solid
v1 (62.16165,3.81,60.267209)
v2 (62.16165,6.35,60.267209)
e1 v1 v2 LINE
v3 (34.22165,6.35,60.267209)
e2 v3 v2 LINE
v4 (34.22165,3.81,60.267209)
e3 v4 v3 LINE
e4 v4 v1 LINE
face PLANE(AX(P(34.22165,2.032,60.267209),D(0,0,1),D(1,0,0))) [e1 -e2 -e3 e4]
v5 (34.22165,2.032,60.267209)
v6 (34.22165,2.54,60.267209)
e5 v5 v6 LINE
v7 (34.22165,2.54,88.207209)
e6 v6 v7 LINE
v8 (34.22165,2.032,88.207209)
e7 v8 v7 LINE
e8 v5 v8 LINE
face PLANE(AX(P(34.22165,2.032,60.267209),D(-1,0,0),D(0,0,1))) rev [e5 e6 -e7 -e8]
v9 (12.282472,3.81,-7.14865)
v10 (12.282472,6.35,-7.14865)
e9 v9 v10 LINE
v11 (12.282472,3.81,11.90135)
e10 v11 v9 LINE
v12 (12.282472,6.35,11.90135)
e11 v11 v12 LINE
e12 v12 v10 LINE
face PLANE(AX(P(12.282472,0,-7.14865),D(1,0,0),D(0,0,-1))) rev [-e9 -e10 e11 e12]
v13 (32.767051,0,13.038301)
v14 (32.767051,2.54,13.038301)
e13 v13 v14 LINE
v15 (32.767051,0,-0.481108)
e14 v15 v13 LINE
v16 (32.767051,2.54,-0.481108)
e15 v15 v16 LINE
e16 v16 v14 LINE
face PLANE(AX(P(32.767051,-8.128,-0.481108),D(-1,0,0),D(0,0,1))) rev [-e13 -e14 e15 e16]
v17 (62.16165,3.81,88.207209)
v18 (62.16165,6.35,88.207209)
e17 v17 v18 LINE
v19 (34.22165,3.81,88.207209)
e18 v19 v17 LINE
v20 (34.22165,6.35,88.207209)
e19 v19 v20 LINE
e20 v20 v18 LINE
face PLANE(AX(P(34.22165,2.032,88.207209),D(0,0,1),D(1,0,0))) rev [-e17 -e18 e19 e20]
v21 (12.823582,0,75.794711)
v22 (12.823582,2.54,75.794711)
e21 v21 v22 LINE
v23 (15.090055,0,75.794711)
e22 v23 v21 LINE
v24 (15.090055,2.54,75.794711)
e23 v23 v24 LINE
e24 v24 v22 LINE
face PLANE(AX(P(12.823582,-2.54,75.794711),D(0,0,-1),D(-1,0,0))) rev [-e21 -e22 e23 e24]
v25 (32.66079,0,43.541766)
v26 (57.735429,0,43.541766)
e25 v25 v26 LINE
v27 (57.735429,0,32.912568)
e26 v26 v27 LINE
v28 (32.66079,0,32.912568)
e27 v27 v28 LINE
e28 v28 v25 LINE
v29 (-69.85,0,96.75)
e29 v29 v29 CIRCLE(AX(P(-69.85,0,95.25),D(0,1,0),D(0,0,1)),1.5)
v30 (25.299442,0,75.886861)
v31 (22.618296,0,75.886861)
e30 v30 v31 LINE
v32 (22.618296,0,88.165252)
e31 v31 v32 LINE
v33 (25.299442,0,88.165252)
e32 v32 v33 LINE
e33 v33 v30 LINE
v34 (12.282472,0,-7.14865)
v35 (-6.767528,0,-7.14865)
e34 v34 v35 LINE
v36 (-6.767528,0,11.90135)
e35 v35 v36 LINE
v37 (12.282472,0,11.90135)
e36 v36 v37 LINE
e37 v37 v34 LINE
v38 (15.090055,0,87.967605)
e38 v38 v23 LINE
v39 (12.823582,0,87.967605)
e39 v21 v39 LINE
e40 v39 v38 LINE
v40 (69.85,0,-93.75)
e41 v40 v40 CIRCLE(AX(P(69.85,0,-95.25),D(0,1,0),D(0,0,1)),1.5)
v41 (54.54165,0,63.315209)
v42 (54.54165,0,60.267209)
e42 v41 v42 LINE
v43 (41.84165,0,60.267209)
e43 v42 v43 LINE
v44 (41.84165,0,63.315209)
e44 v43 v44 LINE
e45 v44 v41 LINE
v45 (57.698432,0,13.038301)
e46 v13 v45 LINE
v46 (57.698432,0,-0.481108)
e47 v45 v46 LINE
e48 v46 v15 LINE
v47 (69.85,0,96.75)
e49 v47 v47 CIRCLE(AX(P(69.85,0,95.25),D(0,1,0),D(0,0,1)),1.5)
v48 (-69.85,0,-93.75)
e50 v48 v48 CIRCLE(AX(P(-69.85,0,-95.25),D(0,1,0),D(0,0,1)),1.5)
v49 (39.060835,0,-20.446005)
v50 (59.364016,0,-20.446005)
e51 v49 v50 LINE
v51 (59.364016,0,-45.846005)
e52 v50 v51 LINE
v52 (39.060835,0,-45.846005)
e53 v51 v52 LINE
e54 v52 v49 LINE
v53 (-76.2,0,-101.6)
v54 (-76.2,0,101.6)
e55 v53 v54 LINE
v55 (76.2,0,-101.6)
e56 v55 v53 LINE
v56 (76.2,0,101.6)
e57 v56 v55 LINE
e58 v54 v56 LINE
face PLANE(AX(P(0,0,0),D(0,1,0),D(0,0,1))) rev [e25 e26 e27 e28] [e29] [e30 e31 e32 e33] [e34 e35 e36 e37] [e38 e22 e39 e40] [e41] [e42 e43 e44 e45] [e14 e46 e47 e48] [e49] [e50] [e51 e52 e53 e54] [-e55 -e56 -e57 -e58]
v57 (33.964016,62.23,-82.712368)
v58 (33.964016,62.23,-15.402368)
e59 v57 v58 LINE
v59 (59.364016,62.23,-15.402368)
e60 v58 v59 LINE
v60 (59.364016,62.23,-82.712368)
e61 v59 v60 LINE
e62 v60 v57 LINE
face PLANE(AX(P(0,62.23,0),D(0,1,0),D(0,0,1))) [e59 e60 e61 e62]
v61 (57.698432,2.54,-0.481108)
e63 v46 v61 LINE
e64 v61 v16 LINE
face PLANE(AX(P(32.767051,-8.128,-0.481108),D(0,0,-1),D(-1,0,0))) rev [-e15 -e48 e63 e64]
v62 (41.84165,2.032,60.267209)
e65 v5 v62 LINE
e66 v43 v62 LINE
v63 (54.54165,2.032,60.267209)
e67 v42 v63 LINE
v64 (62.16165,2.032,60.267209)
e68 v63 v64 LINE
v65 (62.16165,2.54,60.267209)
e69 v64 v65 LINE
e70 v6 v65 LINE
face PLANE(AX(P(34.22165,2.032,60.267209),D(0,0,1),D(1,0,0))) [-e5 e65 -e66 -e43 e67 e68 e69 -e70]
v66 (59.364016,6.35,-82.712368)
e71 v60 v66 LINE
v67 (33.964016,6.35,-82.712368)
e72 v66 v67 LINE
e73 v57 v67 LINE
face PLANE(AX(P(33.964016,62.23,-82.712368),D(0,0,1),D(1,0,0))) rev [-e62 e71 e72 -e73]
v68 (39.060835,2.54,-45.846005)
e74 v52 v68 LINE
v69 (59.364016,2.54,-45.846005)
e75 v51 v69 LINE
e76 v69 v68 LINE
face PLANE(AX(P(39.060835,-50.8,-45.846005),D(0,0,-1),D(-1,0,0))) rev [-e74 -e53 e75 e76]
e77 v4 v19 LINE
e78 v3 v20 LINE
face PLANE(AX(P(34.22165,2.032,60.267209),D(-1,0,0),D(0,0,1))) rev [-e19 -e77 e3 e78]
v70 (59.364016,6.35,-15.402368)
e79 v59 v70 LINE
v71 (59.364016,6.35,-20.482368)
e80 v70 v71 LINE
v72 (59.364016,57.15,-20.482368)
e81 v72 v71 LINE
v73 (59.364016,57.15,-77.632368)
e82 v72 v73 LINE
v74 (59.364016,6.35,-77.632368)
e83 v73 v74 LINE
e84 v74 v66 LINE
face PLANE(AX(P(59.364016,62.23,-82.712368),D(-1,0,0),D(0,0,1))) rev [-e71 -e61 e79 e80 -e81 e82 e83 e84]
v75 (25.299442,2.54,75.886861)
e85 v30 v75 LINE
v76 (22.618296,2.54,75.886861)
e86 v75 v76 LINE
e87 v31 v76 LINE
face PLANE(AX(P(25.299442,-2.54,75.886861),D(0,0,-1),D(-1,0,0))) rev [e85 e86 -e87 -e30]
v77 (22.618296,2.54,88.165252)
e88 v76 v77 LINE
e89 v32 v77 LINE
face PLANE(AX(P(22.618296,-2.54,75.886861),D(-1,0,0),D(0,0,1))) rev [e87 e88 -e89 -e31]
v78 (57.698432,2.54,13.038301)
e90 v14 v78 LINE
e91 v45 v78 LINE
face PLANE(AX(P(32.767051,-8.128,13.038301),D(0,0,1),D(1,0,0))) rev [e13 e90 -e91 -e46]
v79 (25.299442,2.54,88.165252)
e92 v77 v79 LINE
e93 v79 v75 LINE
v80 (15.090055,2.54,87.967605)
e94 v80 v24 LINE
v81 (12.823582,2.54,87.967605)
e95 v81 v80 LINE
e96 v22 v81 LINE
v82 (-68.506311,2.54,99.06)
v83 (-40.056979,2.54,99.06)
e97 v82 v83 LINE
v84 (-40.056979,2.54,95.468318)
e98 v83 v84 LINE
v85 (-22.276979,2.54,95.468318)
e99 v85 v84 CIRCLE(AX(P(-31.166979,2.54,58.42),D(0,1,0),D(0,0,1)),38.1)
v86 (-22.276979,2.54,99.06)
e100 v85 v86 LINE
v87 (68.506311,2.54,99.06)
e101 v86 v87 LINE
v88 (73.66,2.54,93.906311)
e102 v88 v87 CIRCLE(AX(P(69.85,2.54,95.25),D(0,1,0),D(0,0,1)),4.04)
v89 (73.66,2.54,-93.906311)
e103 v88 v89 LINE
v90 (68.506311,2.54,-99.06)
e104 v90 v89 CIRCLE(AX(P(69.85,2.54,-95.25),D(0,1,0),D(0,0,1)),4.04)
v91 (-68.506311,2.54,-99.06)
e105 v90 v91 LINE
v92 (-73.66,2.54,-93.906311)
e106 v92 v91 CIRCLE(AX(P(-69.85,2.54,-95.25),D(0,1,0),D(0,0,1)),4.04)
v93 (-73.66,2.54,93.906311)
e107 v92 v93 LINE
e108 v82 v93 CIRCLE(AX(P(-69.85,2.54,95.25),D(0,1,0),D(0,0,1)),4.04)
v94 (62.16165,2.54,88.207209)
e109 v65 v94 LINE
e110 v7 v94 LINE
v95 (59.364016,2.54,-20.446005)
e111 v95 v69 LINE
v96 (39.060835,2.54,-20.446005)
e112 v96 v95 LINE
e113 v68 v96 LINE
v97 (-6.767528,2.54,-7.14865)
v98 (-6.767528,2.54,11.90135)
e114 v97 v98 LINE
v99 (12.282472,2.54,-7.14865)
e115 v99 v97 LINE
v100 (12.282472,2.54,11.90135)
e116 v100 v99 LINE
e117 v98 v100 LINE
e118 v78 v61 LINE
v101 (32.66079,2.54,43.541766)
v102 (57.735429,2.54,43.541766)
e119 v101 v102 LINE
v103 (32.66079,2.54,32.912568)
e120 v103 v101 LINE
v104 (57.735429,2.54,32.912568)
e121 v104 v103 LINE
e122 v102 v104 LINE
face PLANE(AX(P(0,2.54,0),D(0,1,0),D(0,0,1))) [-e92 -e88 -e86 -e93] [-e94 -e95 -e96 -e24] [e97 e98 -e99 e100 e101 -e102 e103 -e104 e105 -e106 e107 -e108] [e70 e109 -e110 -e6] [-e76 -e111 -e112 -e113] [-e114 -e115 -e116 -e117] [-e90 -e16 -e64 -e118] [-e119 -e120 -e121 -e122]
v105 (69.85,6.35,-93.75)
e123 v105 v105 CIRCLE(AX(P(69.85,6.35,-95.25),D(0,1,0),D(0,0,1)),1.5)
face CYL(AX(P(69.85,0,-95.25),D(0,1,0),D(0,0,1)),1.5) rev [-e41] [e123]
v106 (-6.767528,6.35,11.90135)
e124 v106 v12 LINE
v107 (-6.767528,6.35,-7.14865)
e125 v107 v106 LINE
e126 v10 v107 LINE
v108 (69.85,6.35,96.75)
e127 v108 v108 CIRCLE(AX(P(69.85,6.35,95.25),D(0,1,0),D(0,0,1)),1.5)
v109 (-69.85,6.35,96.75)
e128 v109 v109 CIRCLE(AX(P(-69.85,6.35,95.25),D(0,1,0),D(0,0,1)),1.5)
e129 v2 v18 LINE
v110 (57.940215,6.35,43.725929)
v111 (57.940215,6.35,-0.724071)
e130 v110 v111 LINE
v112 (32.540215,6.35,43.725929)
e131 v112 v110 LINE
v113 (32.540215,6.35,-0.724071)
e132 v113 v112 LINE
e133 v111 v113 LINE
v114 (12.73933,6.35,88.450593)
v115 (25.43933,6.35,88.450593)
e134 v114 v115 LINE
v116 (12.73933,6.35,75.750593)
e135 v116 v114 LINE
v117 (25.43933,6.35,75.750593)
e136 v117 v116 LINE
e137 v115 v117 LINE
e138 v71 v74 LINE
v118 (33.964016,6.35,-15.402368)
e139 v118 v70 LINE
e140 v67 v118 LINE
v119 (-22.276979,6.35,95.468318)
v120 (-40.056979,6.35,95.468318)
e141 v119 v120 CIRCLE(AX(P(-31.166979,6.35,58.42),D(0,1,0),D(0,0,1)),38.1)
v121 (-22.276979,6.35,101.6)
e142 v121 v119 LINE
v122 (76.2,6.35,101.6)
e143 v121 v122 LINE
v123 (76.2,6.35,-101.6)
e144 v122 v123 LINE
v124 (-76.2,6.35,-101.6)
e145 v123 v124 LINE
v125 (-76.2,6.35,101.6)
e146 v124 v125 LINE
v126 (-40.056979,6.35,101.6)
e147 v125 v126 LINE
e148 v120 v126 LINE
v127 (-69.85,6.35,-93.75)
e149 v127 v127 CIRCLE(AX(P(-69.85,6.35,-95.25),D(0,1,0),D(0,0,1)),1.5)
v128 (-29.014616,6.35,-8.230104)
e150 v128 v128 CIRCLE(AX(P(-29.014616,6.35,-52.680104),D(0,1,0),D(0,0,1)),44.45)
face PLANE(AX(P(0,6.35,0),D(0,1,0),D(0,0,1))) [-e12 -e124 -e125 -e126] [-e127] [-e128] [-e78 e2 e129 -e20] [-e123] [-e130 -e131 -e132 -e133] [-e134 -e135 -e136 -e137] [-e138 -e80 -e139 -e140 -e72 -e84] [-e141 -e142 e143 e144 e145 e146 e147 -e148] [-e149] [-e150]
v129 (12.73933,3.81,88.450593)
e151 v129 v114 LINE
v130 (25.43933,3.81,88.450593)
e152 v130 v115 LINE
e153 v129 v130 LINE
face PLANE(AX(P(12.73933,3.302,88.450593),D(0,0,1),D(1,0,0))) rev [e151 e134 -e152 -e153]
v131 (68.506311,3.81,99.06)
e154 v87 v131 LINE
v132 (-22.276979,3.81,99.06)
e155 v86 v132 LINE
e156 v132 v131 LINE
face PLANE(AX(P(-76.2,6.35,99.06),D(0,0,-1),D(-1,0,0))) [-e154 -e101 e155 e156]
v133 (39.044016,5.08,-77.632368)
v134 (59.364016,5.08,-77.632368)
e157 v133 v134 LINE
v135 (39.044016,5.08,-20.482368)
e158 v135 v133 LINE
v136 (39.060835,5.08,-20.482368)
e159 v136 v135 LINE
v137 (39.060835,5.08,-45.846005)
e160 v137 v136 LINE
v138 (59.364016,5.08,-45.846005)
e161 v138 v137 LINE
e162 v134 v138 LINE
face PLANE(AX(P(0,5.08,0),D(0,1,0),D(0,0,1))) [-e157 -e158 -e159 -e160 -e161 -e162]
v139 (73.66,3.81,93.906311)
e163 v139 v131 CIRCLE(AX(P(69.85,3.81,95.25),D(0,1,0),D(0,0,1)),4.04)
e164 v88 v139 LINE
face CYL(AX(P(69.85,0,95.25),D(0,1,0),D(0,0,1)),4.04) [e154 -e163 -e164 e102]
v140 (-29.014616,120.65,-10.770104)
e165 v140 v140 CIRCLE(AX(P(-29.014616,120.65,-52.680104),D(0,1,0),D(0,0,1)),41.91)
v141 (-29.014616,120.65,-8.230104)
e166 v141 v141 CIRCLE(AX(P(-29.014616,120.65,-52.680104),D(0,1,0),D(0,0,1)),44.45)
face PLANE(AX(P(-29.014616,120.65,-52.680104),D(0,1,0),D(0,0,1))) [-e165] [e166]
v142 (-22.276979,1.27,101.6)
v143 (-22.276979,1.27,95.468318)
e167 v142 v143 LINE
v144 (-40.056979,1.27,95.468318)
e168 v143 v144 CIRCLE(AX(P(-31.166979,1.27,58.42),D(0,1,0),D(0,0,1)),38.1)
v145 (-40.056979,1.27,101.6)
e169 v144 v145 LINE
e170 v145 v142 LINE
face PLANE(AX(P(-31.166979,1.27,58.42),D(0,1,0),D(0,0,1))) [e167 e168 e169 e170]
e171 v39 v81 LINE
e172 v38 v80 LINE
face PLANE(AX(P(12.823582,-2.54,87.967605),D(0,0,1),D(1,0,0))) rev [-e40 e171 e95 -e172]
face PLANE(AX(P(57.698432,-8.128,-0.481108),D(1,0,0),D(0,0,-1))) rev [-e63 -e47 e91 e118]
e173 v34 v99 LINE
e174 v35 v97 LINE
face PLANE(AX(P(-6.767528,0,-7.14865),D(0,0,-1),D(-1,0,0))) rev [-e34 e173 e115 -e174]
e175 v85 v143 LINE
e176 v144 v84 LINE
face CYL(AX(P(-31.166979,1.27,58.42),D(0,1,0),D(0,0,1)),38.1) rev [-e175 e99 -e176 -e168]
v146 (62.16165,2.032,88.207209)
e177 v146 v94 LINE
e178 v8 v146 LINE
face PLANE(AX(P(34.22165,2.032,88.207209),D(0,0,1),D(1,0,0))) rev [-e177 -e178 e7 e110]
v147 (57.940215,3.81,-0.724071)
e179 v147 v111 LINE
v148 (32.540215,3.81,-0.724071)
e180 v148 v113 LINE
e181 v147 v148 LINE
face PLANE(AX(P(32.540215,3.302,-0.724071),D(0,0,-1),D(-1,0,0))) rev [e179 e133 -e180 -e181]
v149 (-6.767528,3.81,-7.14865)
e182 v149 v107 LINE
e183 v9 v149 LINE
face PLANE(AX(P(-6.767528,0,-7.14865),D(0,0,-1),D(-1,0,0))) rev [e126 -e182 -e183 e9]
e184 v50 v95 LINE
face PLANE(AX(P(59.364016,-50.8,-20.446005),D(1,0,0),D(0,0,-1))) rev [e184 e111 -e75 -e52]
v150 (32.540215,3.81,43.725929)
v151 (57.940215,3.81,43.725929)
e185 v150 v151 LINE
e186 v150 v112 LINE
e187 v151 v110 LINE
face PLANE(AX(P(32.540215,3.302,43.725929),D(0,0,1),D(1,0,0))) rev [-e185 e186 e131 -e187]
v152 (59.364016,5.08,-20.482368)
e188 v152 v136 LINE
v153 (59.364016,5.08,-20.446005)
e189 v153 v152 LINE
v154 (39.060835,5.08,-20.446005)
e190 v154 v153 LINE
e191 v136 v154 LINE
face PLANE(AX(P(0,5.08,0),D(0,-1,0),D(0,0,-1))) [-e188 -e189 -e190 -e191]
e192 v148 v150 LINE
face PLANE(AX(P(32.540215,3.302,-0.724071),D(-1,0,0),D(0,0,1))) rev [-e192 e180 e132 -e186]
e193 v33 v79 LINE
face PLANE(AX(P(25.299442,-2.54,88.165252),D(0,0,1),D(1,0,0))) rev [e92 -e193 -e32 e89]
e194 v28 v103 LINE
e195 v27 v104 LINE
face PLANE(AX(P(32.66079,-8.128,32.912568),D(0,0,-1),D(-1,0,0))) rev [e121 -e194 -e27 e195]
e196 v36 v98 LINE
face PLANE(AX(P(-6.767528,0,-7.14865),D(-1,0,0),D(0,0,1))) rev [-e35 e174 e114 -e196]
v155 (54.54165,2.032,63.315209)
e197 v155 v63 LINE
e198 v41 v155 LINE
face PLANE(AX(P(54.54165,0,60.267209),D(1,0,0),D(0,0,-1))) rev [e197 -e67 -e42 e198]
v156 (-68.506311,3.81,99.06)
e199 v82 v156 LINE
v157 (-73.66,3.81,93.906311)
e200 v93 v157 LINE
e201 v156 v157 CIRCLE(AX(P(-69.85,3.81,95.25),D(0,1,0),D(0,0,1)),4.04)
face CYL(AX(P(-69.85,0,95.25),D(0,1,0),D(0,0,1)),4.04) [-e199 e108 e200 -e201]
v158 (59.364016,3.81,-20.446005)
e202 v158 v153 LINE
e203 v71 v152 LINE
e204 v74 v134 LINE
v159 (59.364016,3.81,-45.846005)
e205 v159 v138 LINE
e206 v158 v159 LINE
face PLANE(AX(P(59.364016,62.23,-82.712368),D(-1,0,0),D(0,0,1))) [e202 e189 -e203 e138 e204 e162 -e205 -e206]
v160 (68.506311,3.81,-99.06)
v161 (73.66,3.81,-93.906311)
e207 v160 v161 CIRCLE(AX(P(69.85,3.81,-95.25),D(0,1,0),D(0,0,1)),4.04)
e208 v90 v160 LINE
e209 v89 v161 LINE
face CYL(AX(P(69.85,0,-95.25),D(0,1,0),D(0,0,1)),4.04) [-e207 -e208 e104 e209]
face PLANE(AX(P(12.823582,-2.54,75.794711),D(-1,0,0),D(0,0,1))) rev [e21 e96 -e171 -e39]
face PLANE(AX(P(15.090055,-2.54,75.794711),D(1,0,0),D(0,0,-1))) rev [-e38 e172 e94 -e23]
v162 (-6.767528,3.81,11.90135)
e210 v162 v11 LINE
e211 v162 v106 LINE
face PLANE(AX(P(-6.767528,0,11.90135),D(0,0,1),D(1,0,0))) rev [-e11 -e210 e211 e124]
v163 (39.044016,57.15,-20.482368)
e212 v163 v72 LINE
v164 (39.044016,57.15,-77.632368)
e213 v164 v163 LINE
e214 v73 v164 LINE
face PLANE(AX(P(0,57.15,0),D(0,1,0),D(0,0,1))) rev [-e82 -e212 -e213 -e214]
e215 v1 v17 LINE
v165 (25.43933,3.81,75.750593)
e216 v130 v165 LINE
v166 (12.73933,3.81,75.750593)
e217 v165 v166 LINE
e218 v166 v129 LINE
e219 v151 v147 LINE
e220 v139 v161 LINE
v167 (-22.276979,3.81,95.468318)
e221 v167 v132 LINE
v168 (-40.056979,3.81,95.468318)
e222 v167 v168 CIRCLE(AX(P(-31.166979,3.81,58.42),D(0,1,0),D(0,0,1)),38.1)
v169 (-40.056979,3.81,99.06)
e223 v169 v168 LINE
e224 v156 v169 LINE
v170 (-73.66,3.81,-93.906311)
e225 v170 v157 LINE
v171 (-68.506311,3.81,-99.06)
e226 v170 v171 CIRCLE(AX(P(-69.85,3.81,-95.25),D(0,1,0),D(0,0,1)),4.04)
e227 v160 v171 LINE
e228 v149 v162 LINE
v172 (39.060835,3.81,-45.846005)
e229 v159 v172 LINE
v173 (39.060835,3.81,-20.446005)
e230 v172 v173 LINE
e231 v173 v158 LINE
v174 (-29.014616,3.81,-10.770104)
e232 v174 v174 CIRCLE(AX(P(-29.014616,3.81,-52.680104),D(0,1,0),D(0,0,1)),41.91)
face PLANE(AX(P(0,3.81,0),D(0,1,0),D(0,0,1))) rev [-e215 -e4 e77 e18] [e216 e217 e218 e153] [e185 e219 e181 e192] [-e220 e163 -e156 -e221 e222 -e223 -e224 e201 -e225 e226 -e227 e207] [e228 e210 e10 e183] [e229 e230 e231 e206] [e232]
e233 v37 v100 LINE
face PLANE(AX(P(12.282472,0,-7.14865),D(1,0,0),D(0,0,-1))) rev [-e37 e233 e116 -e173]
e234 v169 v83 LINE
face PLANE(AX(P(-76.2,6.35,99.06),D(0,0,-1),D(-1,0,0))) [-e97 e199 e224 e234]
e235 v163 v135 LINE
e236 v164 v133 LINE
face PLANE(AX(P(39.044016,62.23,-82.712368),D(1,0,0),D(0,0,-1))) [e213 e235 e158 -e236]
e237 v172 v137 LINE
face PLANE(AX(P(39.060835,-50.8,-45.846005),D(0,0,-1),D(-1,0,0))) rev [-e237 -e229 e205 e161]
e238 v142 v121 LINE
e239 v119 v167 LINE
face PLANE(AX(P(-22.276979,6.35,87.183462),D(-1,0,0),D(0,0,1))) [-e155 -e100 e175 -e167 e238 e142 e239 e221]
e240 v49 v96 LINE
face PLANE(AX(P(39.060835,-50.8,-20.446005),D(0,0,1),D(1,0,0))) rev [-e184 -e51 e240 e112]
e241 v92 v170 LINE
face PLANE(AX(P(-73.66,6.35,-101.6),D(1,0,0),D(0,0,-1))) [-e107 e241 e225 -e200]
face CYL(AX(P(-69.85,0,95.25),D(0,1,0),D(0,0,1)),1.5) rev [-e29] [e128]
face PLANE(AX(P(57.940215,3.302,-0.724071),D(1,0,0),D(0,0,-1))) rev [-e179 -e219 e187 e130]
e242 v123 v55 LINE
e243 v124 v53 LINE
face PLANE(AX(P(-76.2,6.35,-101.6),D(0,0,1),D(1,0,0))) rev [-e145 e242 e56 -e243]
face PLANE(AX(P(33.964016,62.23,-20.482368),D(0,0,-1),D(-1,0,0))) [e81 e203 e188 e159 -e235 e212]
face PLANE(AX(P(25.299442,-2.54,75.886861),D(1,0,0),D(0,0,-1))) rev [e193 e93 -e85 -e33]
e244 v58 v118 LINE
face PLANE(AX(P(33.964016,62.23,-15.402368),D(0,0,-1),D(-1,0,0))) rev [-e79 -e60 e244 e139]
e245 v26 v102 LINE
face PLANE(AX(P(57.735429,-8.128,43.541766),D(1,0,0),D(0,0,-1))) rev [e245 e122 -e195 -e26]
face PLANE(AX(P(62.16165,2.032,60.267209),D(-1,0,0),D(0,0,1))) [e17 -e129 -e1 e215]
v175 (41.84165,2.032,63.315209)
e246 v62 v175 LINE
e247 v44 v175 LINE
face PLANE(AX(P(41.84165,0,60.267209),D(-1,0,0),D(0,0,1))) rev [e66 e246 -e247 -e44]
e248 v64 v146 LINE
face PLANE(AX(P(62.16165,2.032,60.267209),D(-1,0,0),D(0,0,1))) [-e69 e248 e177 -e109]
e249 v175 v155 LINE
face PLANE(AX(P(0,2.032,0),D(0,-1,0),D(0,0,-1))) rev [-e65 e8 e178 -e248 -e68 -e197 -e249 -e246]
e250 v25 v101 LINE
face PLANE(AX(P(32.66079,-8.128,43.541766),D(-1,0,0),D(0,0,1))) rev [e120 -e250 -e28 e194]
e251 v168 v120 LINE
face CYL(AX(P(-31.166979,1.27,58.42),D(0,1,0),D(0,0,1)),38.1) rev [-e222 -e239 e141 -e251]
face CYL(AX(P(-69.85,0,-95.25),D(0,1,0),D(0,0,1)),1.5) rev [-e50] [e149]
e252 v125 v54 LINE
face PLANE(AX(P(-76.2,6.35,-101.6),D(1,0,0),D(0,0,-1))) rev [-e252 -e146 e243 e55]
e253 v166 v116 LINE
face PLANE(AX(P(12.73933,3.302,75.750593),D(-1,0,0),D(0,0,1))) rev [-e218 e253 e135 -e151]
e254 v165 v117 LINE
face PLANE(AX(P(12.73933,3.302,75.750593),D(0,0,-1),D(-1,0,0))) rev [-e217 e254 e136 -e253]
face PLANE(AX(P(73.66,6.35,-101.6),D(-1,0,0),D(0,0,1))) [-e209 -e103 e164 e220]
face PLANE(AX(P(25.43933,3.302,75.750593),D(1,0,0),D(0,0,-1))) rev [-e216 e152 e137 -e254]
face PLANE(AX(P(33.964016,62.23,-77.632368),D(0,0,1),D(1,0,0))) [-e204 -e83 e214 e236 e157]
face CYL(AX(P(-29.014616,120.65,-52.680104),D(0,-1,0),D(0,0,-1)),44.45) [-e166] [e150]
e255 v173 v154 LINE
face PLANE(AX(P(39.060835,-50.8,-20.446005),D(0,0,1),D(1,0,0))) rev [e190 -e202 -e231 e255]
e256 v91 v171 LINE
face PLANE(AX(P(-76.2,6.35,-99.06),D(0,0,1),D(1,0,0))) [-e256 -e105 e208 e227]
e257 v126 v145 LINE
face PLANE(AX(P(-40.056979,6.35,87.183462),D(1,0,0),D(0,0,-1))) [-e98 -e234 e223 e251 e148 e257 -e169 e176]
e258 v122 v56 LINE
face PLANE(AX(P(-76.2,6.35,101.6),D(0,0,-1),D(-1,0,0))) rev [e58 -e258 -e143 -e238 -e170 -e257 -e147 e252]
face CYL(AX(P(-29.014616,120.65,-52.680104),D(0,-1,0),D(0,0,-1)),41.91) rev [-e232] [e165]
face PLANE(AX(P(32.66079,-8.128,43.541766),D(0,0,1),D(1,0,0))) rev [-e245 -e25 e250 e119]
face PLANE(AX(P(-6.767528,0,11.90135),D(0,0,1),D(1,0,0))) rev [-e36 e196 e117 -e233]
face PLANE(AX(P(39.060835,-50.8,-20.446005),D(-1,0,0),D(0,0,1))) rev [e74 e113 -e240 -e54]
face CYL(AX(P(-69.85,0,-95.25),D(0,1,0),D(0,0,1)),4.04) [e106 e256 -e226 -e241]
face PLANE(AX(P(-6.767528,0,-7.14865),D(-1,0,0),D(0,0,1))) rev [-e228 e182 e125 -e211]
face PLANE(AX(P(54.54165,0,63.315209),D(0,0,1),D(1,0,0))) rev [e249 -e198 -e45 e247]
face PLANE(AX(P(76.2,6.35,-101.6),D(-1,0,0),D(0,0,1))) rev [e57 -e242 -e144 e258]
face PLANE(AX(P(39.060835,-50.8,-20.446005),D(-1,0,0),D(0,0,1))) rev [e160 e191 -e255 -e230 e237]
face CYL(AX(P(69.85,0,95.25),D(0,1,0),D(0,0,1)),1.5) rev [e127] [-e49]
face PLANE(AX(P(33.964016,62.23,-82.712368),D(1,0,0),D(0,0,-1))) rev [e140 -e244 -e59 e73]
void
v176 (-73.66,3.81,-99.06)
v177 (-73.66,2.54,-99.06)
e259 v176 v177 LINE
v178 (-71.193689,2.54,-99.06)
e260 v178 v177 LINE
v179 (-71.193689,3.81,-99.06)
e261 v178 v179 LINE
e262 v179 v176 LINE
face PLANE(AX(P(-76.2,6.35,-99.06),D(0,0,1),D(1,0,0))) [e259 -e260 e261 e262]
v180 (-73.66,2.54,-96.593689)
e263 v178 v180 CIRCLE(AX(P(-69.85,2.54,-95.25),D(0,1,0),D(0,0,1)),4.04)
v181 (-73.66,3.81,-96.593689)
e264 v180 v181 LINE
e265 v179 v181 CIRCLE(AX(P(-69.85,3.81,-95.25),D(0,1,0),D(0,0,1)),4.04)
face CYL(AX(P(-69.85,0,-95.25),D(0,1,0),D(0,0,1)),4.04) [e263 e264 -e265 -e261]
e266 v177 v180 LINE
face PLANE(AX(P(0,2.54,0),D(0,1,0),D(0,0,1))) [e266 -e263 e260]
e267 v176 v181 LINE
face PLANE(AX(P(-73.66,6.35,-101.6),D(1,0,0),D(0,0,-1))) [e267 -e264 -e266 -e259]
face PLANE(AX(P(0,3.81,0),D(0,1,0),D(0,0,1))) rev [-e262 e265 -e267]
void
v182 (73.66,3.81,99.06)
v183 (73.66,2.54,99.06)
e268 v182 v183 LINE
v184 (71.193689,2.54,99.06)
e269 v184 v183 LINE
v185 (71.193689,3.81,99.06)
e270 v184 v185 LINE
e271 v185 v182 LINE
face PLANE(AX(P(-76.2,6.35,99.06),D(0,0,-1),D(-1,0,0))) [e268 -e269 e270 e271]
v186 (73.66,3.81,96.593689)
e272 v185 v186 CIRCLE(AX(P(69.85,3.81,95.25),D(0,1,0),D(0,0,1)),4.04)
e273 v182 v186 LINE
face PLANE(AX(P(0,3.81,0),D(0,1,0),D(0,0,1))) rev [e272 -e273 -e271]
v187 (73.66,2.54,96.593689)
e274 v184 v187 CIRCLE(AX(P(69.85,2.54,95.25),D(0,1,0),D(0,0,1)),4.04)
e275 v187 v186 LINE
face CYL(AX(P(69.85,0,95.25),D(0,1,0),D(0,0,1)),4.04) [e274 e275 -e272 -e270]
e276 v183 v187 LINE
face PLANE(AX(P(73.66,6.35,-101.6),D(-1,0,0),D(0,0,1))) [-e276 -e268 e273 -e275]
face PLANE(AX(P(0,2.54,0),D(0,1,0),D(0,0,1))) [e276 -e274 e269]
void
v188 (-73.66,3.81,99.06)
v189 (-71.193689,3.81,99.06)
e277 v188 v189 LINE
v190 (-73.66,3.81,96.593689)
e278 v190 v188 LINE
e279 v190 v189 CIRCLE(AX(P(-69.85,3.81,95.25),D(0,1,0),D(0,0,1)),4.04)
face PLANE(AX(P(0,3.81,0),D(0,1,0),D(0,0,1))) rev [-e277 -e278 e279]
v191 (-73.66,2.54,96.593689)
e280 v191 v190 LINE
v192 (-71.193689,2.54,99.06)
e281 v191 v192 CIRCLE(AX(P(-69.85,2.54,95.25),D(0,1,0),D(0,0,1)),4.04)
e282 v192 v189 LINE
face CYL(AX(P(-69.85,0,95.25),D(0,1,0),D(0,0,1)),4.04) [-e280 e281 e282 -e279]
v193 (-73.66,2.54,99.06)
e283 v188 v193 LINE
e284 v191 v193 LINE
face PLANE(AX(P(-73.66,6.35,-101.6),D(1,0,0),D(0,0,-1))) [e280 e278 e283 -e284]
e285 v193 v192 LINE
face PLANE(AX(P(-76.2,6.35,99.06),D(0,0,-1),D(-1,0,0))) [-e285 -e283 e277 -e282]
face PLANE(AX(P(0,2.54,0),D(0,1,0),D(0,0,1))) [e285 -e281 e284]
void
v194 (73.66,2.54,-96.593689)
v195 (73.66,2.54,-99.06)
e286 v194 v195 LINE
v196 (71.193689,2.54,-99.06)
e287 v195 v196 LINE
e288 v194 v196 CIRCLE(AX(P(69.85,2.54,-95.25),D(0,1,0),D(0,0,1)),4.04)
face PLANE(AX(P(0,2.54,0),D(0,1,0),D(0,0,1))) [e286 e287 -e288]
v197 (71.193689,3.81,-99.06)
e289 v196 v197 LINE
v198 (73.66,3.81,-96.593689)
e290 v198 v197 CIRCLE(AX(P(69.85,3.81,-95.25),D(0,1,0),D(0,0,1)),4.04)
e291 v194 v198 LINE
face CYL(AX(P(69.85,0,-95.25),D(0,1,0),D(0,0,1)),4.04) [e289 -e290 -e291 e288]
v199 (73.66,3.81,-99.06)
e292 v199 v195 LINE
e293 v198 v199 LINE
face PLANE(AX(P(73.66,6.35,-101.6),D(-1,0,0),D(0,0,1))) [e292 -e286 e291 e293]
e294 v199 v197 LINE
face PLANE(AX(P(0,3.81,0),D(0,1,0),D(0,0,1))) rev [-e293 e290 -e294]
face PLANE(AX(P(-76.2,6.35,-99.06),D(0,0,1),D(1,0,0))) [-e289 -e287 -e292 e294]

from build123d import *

# Parameters (mm, degrees)
SKETCH1_W           = 152.4
SKETCH1_H           = 203.2
BOSS_EXTRUDE2_DEPTH = 6.35
SKETCH2_R           = 1.5
CUT_EXTRUDE1_DEPTH  = 128.158650905
SKETCH3_R           = 1.5
CUT_EXTRUDE2_DEPTH  = 128.158650905
SKETCH4_R           = 1.5
CUT_EXTRUDE3_DEPTH  = 128.158650905
SKETCH5_R           = 44.45
BOSS_EXTRUDE3_DEPTH = 114.3
SHELL1_START        = 2.54
SHELL1_OUTLINE_R    = 41.91
SHELL1_DEPTH        = 118.11
SHELL1_2_OUTLINE_R  = 41.91
SHELL1_2_DEPTH      = 1.27
SKETCH6_R           = 38.1
CUT_EXTRUDE4_DEPTH  = 5.08
SKETCH7_W           = 17.78
SKETCH7_H           = 18.673076246
CUT_EXTRUDE5_DEPTH  = 5.08
SKETCH8_W           = 19.05
SKETCH8_H           = 19.05
CUT_EXTRUDE6_DEPTH  = 171.861025398
SKETCH9_W           = 27.94
SKETCH9_H           = 27.94
CUT_EXTRUDE7_DEPTH  = 4.318
SKETCH10_W          = 12.7
SKETCH10_H          = 3.048
CUT_EXTRUDE9_DEPTH  = 174.779256311
SKETCH12_W          = 25.4
SKETCH12_H          = 67.31
BOSS_EXTRUDE5_DEPTH = 55.88
SHELL3_START        = 39.044015943
SHELL3_OUTLINE_W    = 52.07
SHELL3_OUTLINE_H    = 57.15
SHELL3_DEPTH        = 20.32
SKETCH13_W          = 20.303180985
SKETCH13_H          = 25.4
CUT_EXTRUDE10_DEPTH = 55.88
SKETCH17_W          = 25.4
SKETCH17_H          = 44.45
CUT_EXTRUDE11_DEPTH = 3.048
SKETCH18_W          = 24.931380967
SKETCH18_H          = 13.519409137
CUT_EXTRUDE12_DEPTH = 10.668
SKETCH19_W          = 25.074639176
SKETCH19_H          = 10.629198189
CUT_EXTRUDE13_DEPTH = 10.668
SKETCH20_W          = 12.7
SKETCH20_H          = 12.7
CUT_EXTRUDE14_DEPTH = 3.048
SKETCH22_W          = 2.266473324
SKETCH22_H          = 12.172894029
CUT_EXTRUDE15_DEPTH = 5.08
SKETCH23_W          = 2.681145579
SKETCH23_H          = 12.278390502
CUT_EXTRUDE16_DEPTH = 5.08


# Read off the part's stored shape, not the designer's step: Shell1, Shell3
with BuildPart() as part:
    # Sketch1 → Boss-Extrude2 (new body)
    with BuildSketch(Plane(origin=(0, 0, 0), x_dir=(1, 0, 0), z_dir=(0, 1, 0))):
        Rectangle(SKETCH1_W, SKETCH1_H)
    extrude(amount=BOSS_EXTRUDE2_DEPTH)

    # Sketch2 → Cut-Extrude1 (cut, through all)
    with BuildSketch(Plane(origin=(0, 6.35, 0), x_dir=(1, 0, 0), z_dir=(0, 1, 0))):
        with Locations(Location((-69.85, 95.25, 0), (0, 0, 270))):
            Circle(SKETCH2_R)
    extrude(amount=-CUT_EXTRUDE1_DEPTH, mode=Mode.SUBTRACT)

    # Sketch3 → Cut-Extrude2 (cut, through all)
    with BuildSketch(Plane(origin=(0, 6.35, 0), x_dir=(1, 0, 0), z_dir=(0, 1, 0))):
        with Locations(Location((69.85, 95.25, 0), (0, 0, 270))):
            Circle(SKETCH3_R)
    extrude(amount=-CUT_EXTRUDE2_DEPTH, mode=Mode.SUBTRACT)

    # Sketch4 → Cut-Extrude3 (cut, through all)
    with BuildSketch(Plane(origin=(0, 6.35, 0), x_dir=(1, 0, 0), z_dir=(0, 1, 0))):
        with Locations(Location((69.85, -95.25, 0), (0, 0, 270))):
            Circle(SKETCH4_R)
        with Locations(Location((-69.85, -95.25, 0), (0, 0, 270))):
            Circle(SKETCH4_R)
    extrude(amount=-CUT_EXTRUDE3_DEPTH, mode=Mode.SUBTRACT)

    # Sketch5 → Boss-Extrude3 (add)
    with BuildSketch(Plane(origin=(0, 6.35, 0), x_dir=(1, 0, 0), z_dir=(0, 1, 0))):
        with Locations(Location((-29.014615541, 52.680103604, 0), (0, 0, 270))):
            Circle(SKETCH5_R)
    extrude(amount=BOSS_EXTRUDE3_DEPTH)

    # Shell1 outline → Shell1 (cut)
    with BuildSketch(Plane(origin=(0, 0, 0), x_dir=(1, 0, 0), z_dir=(0, 1, 0)).offset(SHELL1_START)):
        with Locations((-29.014615541, 52.680103604)):
            Circle(SHELL1_OUTLINE_R)
    extrude(amount=SHELL1_DEPTH, mode=Mode.SUBTRACT)

    # Shell1 2 outline → Shell1 2 (cut)
    # profile 1 of 5: a face of its own
    with BuildSketch(Plane(origin=(0, 0, 0), x_dir=(1, 0, 0), z_dir=(0, 1, 0)).offset(SHELL1_START)):
        with BuildLine():
            ThreePointArc((-68.506311048, 99.06), (-66.993288604, 92.393288604), (-73.66, 93.906311048))
            Line((-73.66, 93.906311048), (-73.66, -93.906311048))
            ThreePointArc((-73.66, -93.906311048), (-66.993288604, -92.393288604), (-68.506311048, -99.06))
            Line((-68.506311048, -99.06), (68.506311048, -99.06))
            ThreePointArc((68.506311048, -99.06), (66.993288604, -92.393288604), (73.66, -93.906311048))
            Line((73.66, -93.906311048), (73.66, 93.906311048))
            ThreePointArc((73.66, 93.906311048), (66.993288604, 92.393288604), (68.506311048, 99.06))
            Line((68.506311048, 99.06), (-68.506311048, 99.06))
        make_face()
        with Locations((-29.014615541, 52.680103604)):
            Circle(SHELL1_2_OUTLINE_R, mode=Mode.SUBTRACT)
    # profile 2 of 5: a face of its own
    with BuildSketch(Plane(origin=(0, 0, 0), x_dir=(1, 0, 0), z_dir=(0, 1, 0)).offset(SHELL1_START)):
        with BuildLine():
            ThreePointArc((-73.66, 96.593688952), (-72.706711396, 98.106711396), (-71.193688952, 99.06))
            Line((-71.193688952, 99.06), (-73.66, 99.06))
            Line((-73.66, 99.06), (-73.66, 96.593688952))
        make_face()
    # profile 3 of 5: a face of its own
    with BuildSketch(Plane(origin=(0, 0, 0), x_dir=(1, 0, 0), z_dir=(0, 1, 0)).offset(SHELL1_START)):
        with BuildLine():
            Line((73.66, 99.06), (71.193688952, 99.06))
            ThreePointArc((71.193688952, 99.06), (72.706711396, 98.106711396), (73.66, 96.593688952))
            Line((73.66, 96.593688952), (73.66, 99.06))
        make_face()
    # profile 4 of 5: a face of its own
    with BuildSketch(Plane(origin=(0, 0, 0), x_dir=(1, 0, 0), z_dir=(0, 1, 0)).offset(SHELL1_START)):
        with BuildLine():
            Line((73.66, -99.06), (73.66, -96.593688952))
            ThreePointArc((73.66, -96.593688952), (72.706711396, -98.106711396), (71.193688952, -99.06))
            Line((71.193688952, -99.06), (73.66, -99.06))
        make_face()
    # profile 5 of 5: a face of its own
    with BuildSketch(Plane(origin=(0, 0, 0), x_dir=(1, 0, 0), z_dir=(0, 1, 0)).offset(SHELL1_START)):
        with BuildLine():
            ThreePointArc((-71.193688952, -99.06), (-72.706711396, -98.106711396), (-73.66, -96.593688952))
            Line((-73.66, -96.593688952), (-73.66, -99.06))
            Line((-73.66, -99.06), (-71.193688952, -99.06))
        make_face()
    extrude(amount=SHELL1_2_DEPTH, mode=Mode.SUBTRACT)

    # Sketch6 → Cut-Extrude4 (cut)
    with BuildSketch(Plane(origin=(0, 6.35, 0), x_dir=(1, 0, 0), z_dir=(0, 1, 0))):
        with Locations(Location((-31.166979336, -58.42, 0), (0, 0, 270))):
            Circle(SKETCH6_R)
    extrude(amount=-CUT_EXTRUDE4_DEPTH, mode=Mode.SUBTRACT)

    # Sketch7 → Cut-Extrude5 (cut)
    with BuildSketch(Plane(origin=(0, 1.27, 0), x_dir=(1, 0, 0), z_dir=(0, 1, 0))):
        with Locations((-31.166979336, -96.52)):
            Rectangle(SKETCH7_W, SKETCH7_H)
    extrude(amount=CUT_EXTRUDE5_DEPTH, mode=Mode.SUBTRACT)

    # Sketch8 → Cut-Extrude6 (cut, through all)
    with BuildSketch(Plane(origin=(0, 6.35, 0), x_dir=(1, 0, 0), z_dir=(0, 1, 0))):
        with Locations((2.757472123, -2.376350246)):
            Rectangle(SKETCH8_W, SKETCH8_H)
    extrude(amount=-CUT_EXTRUDE6_DEPTH, mode=Mode.SUBTRACT)

    # Sketch9 → Cut-Extrude7 (cut)
    with BuildSketch(Plane(origin=(0, 6.35, 0), x_dir=(1, 0, 0), z_dir=(0, 1, 0))):
        with Locations((48.191649932, -74.237208762)):
            Rectangle(SKETCH9_W, SKETCH9_H)
    extrude(amount=-CUT_EXTRUDE7_DEPTH, mode=Mode.SUBTRACT)

    # Sketch10 → Cut-Extrude9 (cut, through all)
    with BuildSketch(Plane(origin=(0, 2.032, 0), x_dir=(1, 0, 0), z_dir=(0, 1, 0))):
        with Locations((48.191649932, -61.791208762)):
            Rectangle(SKETCH10_W, SKETCH10_H)
    extrude(amount=-CUT_EXTRUDE9_DEPTH, mode=Mode.SUBTRACT)

    # Sketch12 → Boss-Extrude5 (add)
    with BuildSketch(Plane(origin=(0, 6.35, 0), x_dir=(1, 0, 0), z_dir=(0, 1, 0))):
        with Locations((46.664015943, 49.057368238)):
            Rectangle(SKETCH12_W, SKETCH12_H)
    extrude(amount=BOSS_EXTRUDE5_DEPTH)

    # Shell3 outline → Shell3 (cut)
    with BuildSketch(Plane.YZ.offset(SHELL3_START)):
        with Locations((31.115, -49.057368238)):
            Rectangle(SHELL3_OUTLINE_W, SHELL3_OUTLINE_H)
    extrude(amount=SHELL3_DEPTH, mode=Mode.SUBTRACT)

    # Sketch13 → Cut-Extrude10 (cut)
    with BuildSketch(Plane(origin=(0, 5.08, 0), x_dir=(1, 0, 0), z_dir=(0, 1, 0))):
        with Locations((49.212425451, 33.146004513)):
            Rectangle(SKETCH13_W, SKETCH13_H)
    extrude(amount=-CUT_EXTRUDE10_DEPTH, mode=Mode.SUBTRACT)

    # Sketch17 → Cut-Extrude11 (cut)
    with BuildSketch(Plane(origin=(0, 6.35, 0), x_dir=(1, 0, 0), z_dir=(0, 1, 0))):
        with Locations((45.24021519, -21.500928879)):
            Rectangle(SKETCH17_W, SKETCH17_H)
    extrude(amount=-CUT_EXTRUDE11_DEPTH, mode=Mode.SUBTRACT)

    # Sketch18 → Cut-Extrude12 (cut)
    with BuildSketch(Plane(origin=(0, 2.54, 0), x_dir=(1, 0, 0), z_dir=(0, 1, 0))):
        with Locations((45.232741318, -6.278596744)):
            Rectangle(SKETCH18_W, SKETCH18_H)
    extrude(amount=-CUT_EXTRUDE12_DEPTH, mode=Mode.SUBTRACT)

    # Sketch19 → Cut-Extrude13 (cut)
    with BuildSketch(Plane(origin=(0, 2.54, 0), x_dir=(1, 0, 0), z_dir=(0, 1, 0))):
        with Locations((45.198109279, -38.227166647)):
            Rectangle(SKETCH19_W, SKETCH19_H)
    extrude(amount=-CUT_EXTRUDE13_DEPTH, mode=Mode.SUBTRACT)

    # Sketch20 → Cut-Extrude14 (cut)
    with BuildSketch(Plane(origin=(0, 6.35, 0), x_dir=(1, 0, 0), z_dir=(0, 1, 0))):
        with Locations((19.089329665, -82.100593314)):
            Rectangle(SKETCH20_W, SKETCH20_H)
    extrude(amount=-CUT_EXTRUDE14_DEPTH, mode=Mode.SUBTRACT)

    # Sketch22 → Cut-Extrude15 (cut)
    with BuildSketch(Plane(origin=(0, 2.54, 0), x_dir=(1, 0, 0), z_dir=(0, 1, 0))):
        with Locations((13.956818217, -81.881158104)):
            Rectangle(SKETCH22_W, SKETCH22_H)
    extrude(amount=-CUT_EXTRUDE15_DEPTH, mode=Mode.SUBTRACT)

    # Sketch23 → Cut-Extrude16 (cut)
    with BuildSketch(Plane(origin=(0, 2.54, 0), x_dir=(1, 0, 0), z_dir=(0, 1, 0))):
        with Locations((23.958869164, -82.026056303)):
            Rectangle(SKETCH23_W, SKETCH23_H)
    extrude(amount=-CUT_EXTRUDE16_DEPTH, mode=Mode.SUBTRACT)


solid = part.part
